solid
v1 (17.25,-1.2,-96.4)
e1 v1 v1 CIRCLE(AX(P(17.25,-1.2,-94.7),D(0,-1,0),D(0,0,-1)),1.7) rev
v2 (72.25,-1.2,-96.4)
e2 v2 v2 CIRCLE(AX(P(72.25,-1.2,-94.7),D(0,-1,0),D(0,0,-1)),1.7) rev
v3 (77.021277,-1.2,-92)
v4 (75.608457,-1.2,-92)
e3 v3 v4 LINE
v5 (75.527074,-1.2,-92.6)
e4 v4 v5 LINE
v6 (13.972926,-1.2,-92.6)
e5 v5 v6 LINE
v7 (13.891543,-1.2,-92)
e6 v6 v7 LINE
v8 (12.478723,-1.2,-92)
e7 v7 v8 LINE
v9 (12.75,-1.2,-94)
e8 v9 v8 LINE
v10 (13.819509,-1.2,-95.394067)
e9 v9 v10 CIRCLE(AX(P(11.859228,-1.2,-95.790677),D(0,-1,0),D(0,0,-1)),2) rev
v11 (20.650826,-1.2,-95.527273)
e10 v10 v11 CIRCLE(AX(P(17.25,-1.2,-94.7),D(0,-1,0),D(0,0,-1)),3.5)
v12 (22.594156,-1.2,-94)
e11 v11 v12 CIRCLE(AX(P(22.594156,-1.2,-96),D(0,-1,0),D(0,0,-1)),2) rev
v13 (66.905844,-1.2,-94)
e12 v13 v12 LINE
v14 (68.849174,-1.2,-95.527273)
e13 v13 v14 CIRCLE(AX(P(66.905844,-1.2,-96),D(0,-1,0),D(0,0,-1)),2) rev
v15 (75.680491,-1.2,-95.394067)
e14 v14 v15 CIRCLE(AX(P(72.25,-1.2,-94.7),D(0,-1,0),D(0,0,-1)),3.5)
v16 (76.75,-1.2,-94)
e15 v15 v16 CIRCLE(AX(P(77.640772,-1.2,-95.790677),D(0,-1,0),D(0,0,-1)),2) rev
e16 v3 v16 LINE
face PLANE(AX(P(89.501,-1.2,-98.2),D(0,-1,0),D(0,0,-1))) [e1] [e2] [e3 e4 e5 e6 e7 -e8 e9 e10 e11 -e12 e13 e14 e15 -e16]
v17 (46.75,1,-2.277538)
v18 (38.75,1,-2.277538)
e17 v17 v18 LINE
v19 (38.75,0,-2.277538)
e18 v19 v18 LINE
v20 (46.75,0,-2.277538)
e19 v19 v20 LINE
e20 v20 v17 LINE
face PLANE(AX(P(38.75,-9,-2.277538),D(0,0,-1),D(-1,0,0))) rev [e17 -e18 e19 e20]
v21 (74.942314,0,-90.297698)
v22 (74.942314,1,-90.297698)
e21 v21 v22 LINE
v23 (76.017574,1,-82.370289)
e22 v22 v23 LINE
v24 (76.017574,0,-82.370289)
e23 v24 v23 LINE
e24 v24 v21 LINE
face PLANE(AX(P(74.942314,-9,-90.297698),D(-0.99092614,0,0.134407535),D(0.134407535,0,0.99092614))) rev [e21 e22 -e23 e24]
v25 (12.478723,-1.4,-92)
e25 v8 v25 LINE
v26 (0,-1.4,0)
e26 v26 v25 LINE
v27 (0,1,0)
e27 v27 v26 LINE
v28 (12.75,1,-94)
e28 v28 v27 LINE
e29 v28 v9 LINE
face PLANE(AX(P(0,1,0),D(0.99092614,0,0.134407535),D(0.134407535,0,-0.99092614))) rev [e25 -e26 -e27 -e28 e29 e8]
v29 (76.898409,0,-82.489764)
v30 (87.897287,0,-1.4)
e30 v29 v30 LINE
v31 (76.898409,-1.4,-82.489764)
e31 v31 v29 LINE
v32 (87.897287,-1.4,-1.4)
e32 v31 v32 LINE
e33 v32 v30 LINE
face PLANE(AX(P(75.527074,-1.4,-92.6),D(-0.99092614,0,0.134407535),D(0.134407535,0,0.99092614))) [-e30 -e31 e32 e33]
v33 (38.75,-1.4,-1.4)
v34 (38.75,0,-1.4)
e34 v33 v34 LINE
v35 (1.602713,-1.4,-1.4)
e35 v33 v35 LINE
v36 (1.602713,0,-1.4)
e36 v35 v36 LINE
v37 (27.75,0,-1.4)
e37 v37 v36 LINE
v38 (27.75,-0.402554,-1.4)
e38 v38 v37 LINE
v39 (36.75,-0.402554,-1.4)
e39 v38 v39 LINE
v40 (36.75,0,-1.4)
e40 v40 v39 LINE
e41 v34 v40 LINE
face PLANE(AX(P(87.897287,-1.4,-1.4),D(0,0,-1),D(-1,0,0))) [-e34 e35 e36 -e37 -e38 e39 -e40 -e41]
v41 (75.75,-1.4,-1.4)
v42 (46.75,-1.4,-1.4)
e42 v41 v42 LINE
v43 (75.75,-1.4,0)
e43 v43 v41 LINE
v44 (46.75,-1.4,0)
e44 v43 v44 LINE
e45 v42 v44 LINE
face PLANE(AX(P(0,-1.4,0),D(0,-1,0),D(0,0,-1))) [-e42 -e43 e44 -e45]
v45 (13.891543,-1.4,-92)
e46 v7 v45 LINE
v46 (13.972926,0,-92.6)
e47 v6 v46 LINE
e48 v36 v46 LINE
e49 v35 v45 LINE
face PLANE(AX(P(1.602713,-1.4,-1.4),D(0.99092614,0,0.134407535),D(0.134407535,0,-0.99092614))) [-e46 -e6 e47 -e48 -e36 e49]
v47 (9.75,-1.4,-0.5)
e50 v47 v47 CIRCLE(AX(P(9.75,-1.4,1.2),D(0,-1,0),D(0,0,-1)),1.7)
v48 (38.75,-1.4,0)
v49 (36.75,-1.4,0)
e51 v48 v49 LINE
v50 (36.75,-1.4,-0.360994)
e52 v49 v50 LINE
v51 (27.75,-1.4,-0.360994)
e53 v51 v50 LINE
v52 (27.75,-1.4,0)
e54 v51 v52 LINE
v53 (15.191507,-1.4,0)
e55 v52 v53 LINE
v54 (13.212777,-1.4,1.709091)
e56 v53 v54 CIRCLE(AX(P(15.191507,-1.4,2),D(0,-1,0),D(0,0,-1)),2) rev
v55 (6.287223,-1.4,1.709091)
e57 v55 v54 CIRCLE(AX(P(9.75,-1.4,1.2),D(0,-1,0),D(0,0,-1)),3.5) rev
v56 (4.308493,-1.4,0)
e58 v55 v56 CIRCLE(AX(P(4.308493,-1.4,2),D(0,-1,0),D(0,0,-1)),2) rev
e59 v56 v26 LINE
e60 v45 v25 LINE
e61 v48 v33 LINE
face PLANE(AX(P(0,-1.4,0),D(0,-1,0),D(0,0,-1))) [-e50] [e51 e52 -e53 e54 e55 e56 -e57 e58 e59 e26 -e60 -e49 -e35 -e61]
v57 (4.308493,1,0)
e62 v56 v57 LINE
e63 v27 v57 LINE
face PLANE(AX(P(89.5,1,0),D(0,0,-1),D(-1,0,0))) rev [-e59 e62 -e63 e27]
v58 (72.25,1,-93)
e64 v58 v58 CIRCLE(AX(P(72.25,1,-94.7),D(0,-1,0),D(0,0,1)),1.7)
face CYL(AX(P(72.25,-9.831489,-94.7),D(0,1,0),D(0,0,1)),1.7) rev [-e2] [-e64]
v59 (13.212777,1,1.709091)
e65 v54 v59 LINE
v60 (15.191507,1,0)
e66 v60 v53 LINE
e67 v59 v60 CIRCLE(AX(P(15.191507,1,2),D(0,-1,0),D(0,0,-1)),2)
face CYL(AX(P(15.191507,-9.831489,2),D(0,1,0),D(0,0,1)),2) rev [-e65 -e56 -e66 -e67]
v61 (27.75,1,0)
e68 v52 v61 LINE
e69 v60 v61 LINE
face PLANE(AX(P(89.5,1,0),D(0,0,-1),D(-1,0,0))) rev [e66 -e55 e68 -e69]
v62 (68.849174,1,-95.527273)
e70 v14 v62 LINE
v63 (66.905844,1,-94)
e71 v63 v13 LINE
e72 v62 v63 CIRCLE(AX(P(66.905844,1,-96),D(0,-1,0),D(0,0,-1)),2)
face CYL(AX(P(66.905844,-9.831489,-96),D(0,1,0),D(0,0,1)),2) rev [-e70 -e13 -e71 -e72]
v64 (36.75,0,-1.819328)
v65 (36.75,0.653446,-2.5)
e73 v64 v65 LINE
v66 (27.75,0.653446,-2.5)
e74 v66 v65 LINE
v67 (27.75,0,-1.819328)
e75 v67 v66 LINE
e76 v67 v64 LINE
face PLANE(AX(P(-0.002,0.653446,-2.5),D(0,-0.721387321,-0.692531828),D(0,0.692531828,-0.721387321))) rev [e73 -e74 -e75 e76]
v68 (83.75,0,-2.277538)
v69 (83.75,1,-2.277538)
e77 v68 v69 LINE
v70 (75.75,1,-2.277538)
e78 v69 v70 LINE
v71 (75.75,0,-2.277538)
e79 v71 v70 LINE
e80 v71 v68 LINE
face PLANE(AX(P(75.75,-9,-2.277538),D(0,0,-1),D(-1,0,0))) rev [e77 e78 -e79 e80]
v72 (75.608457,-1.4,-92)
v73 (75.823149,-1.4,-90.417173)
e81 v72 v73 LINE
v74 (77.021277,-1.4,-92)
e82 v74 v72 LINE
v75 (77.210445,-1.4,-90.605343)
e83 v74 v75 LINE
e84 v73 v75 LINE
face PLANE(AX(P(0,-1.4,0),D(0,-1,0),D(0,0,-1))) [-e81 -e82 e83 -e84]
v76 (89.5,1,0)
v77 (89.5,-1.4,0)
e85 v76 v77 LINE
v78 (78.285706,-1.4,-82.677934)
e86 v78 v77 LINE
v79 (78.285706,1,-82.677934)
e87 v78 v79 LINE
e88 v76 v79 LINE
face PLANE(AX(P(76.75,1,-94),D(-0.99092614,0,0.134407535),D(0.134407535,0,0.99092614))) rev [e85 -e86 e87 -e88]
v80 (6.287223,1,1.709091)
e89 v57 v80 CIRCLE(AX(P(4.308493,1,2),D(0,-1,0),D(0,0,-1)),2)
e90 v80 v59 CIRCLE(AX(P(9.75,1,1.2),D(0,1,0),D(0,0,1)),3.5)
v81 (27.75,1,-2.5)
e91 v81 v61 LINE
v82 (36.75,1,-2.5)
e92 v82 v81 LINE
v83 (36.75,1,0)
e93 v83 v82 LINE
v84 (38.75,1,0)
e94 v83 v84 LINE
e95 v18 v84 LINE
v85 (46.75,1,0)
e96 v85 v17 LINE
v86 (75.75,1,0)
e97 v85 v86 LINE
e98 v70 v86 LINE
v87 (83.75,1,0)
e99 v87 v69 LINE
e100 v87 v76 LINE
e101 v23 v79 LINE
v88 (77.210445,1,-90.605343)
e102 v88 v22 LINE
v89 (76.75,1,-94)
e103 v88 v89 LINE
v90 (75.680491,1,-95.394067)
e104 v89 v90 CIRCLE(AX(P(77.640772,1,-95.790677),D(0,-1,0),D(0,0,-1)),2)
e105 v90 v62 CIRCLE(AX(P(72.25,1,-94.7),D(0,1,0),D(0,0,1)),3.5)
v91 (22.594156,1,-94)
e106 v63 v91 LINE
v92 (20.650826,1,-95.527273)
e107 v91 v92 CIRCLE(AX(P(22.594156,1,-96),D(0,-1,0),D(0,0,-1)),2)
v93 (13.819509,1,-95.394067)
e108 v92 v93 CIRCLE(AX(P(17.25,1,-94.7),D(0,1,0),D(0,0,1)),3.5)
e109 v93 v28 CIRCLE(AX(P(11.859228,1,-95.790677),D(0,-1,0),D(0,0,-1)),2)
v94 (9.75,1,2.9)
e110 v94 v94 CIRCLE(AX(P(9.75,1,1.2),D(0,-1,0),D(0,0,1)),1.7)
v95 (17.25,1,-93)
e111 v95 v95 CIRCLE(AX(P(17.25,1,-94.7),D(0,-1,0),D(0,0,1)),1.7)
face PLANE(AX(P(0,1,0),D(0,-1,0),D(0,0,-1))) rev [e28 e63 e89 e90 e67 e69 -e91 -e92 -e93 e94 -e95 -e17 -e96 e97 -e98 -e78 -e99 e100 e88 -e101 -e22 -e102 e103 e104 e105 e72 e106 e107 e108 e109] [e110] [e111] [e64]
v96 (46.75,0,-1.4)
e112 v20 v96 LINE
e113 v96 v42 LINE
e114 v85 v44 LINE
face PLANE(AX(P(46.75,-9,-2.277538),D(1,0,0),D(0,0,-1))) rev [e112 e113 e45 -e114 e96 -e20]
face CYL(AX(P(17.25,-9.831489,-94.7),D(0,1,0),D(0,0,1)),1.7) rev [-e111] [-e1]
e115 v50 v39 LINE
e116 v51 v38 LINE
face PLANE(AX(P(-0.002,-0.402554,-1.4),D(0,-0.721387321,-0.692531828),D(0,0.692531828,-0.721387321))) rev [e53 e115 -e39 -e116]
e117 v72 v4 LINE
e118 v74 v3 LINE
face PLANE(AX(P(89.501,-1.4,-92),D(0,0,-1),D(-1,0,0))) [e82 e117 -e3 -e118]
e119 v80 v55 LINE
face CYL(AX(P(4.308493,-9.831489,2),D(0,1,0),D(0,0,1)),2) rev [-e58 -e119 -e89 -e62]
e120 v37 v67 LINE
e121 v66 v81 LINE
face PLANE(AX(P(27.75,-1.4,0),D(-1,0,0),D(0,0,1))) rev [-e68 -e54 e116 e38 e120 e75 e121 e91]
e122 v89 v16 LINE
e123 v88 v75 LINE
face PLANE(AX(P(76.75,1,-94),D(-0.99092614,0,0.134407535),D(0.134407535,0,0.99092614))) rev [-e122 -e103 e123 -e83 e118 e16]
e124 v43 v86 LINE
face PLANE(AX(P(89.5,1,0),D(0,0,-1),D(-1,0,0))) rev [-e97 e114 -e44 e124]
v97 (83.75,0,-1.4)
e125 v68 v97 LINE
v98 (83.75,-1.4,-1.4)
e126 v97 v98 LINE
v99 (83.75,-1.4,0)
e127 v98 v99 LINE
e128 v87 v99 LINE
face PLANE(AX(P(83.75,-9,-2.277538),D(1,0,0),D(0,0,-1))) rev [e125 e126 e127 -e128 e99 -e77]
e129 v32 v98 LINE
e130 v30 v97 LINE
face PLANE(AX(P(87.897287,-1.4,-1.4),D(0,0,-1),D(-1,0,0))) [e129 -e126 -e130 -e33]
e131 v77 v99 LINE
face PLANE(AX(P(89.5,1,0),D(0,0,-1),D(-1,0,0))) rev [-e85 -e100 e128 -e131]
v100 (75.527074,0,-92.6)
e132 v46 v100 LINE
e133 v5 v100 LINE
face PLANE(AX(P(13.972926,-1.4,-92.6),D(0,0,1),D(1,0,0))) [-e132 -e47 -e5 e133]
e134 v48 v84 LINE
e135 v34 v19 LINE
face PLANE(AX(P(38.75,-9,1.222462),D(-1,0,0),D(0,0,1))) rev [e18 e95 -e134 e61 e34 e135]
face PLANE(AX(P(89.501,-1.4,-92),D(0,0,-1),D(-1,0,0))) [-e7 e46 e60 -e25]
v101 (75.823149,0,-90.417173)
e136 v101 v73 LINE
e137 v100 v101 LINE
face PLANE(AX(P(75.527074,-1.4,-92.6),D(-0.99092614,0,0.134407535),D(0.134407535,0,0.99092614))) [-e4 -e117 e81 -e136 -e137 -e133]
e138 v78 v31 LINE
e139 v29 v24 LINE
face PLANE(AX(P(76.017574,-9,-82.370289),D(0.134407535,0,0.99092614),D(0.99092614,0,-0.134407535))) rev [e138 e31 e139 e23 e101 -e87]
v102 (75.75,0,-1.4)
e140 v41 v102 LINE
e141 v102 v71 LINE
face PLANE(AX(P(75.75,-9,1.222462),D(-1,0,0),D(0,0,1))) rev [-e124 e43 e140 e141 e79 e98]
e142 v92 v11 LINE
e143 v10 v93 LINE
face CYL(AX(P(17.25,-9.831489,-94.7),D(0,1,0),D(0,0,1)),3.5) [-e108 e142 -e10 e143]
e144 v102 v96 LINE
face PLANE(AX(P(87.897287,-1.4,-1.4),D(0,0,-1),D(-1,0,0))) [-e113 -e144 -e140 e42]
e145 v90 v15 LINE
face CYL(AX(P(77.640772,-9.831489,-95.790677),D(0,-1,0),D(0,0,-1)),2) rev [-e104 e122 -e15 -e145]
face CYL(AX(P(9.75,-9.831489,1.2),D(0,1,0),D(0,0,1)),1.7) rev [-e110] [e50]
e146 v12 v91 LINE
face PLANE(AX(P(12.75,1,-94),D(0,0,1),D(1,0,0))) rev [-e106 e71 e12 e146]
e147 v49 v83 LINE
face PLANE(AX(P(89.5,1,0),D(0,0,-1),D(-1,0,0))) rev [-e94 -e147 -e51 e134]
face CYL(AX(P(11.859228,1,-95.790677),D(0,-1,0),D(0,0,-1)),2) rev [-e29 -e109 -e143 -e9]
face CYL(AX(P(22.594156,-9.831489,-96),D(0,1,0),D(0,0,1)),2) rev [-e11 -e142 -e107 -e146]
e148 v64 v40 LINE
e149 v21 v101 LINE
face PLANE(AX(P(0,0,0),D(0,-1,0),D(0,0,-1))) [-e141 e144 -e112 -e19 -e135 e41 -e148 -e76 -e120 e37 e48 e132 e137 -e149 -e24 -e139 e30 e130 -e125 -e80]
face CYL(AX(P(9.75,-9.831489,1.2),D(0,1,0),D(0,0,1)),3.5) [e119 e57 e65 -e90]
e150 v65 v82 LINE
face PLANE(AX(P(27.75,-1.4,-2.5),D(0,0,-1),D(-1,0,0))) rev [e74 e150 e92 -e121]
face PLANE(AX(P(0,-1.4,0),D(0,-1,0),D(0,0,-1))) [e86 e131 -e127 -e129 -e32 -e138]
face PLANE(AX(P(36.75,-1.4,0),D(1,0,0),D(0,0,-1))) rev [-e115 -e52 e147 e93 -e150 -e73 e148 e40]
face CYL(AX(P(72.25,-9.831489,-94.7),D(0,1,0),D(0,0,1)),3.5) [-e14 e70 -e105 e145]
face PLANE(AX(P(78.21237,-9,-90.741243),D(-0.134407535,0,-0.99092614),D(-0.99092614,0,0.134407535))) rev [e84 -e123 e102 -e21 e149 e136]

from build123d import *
from build123d.topology import SkipClean

# Parameters (mm, degrees)
EXTRUDE_1_DEPTH     = 1
EXTRUDE_2_DEPTH     = 1.4
EXTRUDE_3_DEPTH     = 2.4
CUT_EXTRUDE_2_REACH = 134.888
SKETCH_4_R          = 1.7
CUT_EXTRUDE_3_DEPTH = 10
CUT_EXTRUDE_4_REACH = 134.874
SKETCH_6_W          = 6.2
SKETCH_6_H          = 0.2
FILLET_START        = -1.2
FILLET_1_DEPTH      = 2.2
FILLET_START_2      = -1.4
FILLET_1_2_DEPTH    = 0.226512
SKETCH_7_W          = 9
SKETCH_7_H          = 2.5
CUT_EXTRUDE_5_DEPTH = 133.88811083
EXTRUDE_4_REACH     = 113.48


with BuildPart() as part:
    # 草图1 → 凸台-拉伸1 (new body)
    with BuildSketch(Plane(origin=(0, 0, 0), x_dir=(1, 0, 0), z_dir=(0, 1, 0))):
        Polygon((0, 0), (12.75, 94), (76.75, 94), (89.5, 0), align=None)
    extrude(amount=EXTRUDE_1_DEPTH)

    # 草图2 → 凸台-拉伸2 (add)
    with BuildSketch(Plane.XZ):
        Polygon((89.5, 0), (0, 0), (12.75, -94), (76.75, -94), align=None)
        Polygon((87.897286654, -1.4), (1.602713346, -1.4), (13.972926112, -92.6), (75.527073888, -92.6), align=None, mode=Mode.SUBTRACT)
    extrude(amount=EXTRUDE_2_DEPTH)

    # 草图3 → 凸台-拉伸3 (add)
    with BuildSketch(Plane(origin=(0, 1, 0), x_dir=(1, 0, 0), z_dir=(0, 1, 0))):
        with BuildLine():
            Line((6.25, -1.2), (6.25, 0))
            Line((6.25, 0), (8.545840542, 0))
            ThreePointArc((8.545840542, 0), (9.75, -2.9), (10.954159458, 0))
            Line((10.954159458, 0), (13.25, 0))
            Line((13.25, 0), (13.25, -1.2))
            ThreePointArc((13.25, -1.2), (9.75, -4.7), (6.25, -1.2))
        make_face()
        with BuildLine():
            Line((13.75, 94.7), (13.75, 94))
            Line((13.75, 94), (13.82071436, 94))
            Line((13.82071436, 94), (15.700806662, 94))
            ThreePointArc((15.700806662, 94), (17.25, 96.4), (18.799193338, 94))
            Line((18.799193338, 94), (20.75, 94))
            Line((20.75, 94), (20.75, 94.7))
            ThreePointArc((20.75, 94.7), (17.25, 98.2), (13.75, 94.7))
        make_face()
        with BuildLine():
            Line((68.75, 94.7), (68.75, 94))
            Line((68.75, 94), (70.700806662, 94))
            ThreePointArc((70.700806662, 94), (72.25, 96.4), (73.799193338, 94))
            Line((73.799193338, 94), (75.75, 94))
            Line((75.75, 94), (75.75, 94.7))
            ThreePointArc((75.75, 94.7), (72.25, 98.2), (68.75, 94.7))
        make_face()
    extrude(amount=-EXTRUDE_3_DEPTH)

    # 草图4 → 切除-拉伸2 (cut, up to next)
    with BuildSketch(Plane(origin=(0, 1, 0), x_dir=(1, 0, 0), z_dir=(0, 1, 0)), mode=Mode.PRIVATE) as cut_extrude_2_sk1:
        with Locations(Location((9.75, -1.2, 0), (0, 0, 270))):
            Circle(SKETCH_4_R)
    cut_extrude_2_tool1 = extrude(cut_extrude_2_sk1.sketch, amount=-CUT_EXTRUDE_2_REACH, mode=Mode.PRIVATE) & part.part
    # 草图4 → 切除-拉伸2 (cut, up to next)
    with BuildSketch(Plane(origin=(0, 1, 0), x_dir=(1, 0, 0), z_dir=(0, 1, 0)), mode=Mode.PRIVATE) as cut_extrude_2_sk2:
        with Locations(Location((17.25, 94.7, 0), (0, 0, 270))):
            Circle(SKETCH_4_R)
    cut_extrude_2_tool2 = extrude(cut_extrude_2_sk2.sketch, amount=-CUT_EXTRUDE_2_REACH, mode=Mode.PRIVATE) & part.part
    # 草图4 → 切除-拉伸2 (cut, up to next)
    with BuildSketch(Plane(origin=(0, 1, 0), x_dir=(1, 0, 0), z_dir=(0, 1, 0)), mode=Mode.PRIVATE) as cut_extrude_2_sk3:
        with Locations(Location((72.25, 94.7, 0), (0, 0, 270))):
            Circle(SKETCH_4_R)
    cut_extrude_2_tool3 = extrude(cut_extrude_2_sk3.sketch, amount=-CUT_EXTRUDE_2_REACH, mode=Mode.PRIVATE) & part.part
    add(cut_extrude_2_tool1.solids().sort_by_distance((9.75, 1, 1.2))[0], mode=Mode.SUBTRACT)
    add(cut_extrude_2_tool2.solids().sort_by_distance((17.25, 1, -94.7))[0], mode=Mode.SUBTRACT)
    add(cut_extrude_2_tool3.solids().sort_by_distance((72.25, 1, -94.7))[0], mode=Mode.SUBTRACT)

    # 草图5 → 切除-拉伸3 (cut)
    with SkipClean():  # the faces are left unmerged after this step: merging them gives an invalid solid
        with BuildSketch(Plane(origin=(0, 1, 0), x_dir=(1, 0, 0), z_dir=(0, 1, 0))):
            with BuildLine():
                Line((78.21236986, 90.741242548), (74.942313599, 90.297697683))
                Line((74.942313599, 90.297697683), (76.017573878, 82.370288564))
                Line((76.017573878, 82.370288564), (79.28763014, 82.81383343))
                ThreePointArc((79.28763014, 82.81383343), (82.713704559, 87.315168128), (78.21236986, 90.741242548))
            make_face()
            with BuildLine():
                Line((38.75, -1.222462011), (38.75, 2.277537989))
                Line((38.75, 2.277537989), (46.75, 2.277537989))
                Line((46.75, 2.277537989), (46.75, -1.222462011))
                ThreePointArc((46.75, -1.222462011), (42.75, -5.222462011), (38.75, -1.222462011))
            make_face()
            with BuildLine():
                Line((75.75, -1.222462011), (75.75, 2.277537989))
                Line((75.75, 2.277537989), (83.75, 2.277537989))
                Line((83.75, 2.277537989), (83.75, -1.222462011))
                ThreePointArc((83.75, -1.222462011), (79.75, -5.222462011), (75.75, -1.222462011))
            make_face()
        extrude(amount=-CUT_EXTRUDE_3_DEPTH, mode=Mode.SUBTRACT)

    # 草图6 → 切除-拉伸4 (cut, up to next)
    with BuildSketch(Plane(origin=(0, 0, 0), x_dir=(0, 0, -1), z_dir=(1, 0, 0)), mode=Mode.PRIVATE) as cut_extrude_4_sk1:
        with Locations((95.1, -1.3)):
            Rectangle(SKETCH_6_W, SKETCH_6_H)
    cut_extrude_4_tool1 = extrude(cut_extrude_4_sk1.sketch, amount=CUT_EXTRUDE_4_REACH, mode=Mode.PRIVATE) & part.part
    add(cut_extrude_4_tool1.solids().sort_by_distance((0, -1.3, -95.1))[0], mode=Mode.SUBTRACT)

    # 圆角1: read off the stored shape, not the designer's step
    # 圆角1 outline → 圆角1 (add)
    with SkipClean():  # the faces are left unmerged after this step: merging them gives an invalid solid
        with BuildSketch(Plane(origin=(0, 0, 0), x_dir=(1, 0, 0), z_dir=(0, 1, 0)).offset(FILLET_START)):
            with BuildLine():
                ThreePointArc((13.25, -1.2), (13.240681915, -1.455224942), (13.212777274, -1.709090909))
                ThreePointArc((13.212777274, -1.709090909), (13.884185107, -0.486425063), (15.191507144, 0))
                Line((15.191507144, 0), (13.25, 0))
                Line((13.25, 0), (13.25, -1.2))
            make_face()
            with BuildLine():
                ThreePointArc((4.308492856, 0), (5.615814893, -0.486425063), (6.287222726, -1.709090909))
                ThreePointArc((6.287222726, -1.709090909), (6.259318085, -1.455224942), (6.25, -1.2))
                Line((6.25, -1.2), (6.25, 0))
                Line((6.25, 0), (4.308492856, 0))
            make_face()
            with BuildLine():
                Line((75.75, 94), (76.75, 94))
                ThreePointArc((76.75, 94), (76.053957158, 94.573295448), (75.680491288, 95.394067374))
                ThreePointArc((75.680491288, 95.394067374), (75.732579469, 95.048769616), (75.75, 94.7))
                Line((75.75, 94.7), (75.75, 94))
            make_face()
            with BuildLine():
                ThreePointArc((13.75, 94.7), (13.767420531, 95.048769616), (13.819508712, 95.394067374))
                ThreePointArc((13.819508712, 95.394067374), (13.446042842, 94.573295448), (12.75, 94))
                Line((12.75, 94), (13.75, 94))
                Line((13.75, 94), (13.75, 94.7))
            make_face()
            with BuildLine():
                Line((20.75, 94), (22.594155686, 94))
                ThreePointArc((22.594155686, 94), (21.358326925, 94.427509214), (20.650826346, 95.527272727))
                ThreePointArc((20.650826346, 95.527272727), (20.725118143, 95.116598001), (20.75, 94.7))
                Line((20.75, 94.7), (20.75, 94))
            make_face()
            with BuildLine():
                ThreePointArc((68.75, 94.7), (68.774881857, 95.116598001), (68.849173654, 95.527272727))
                ThreePointArc((68.849173654, 95.527272727), (68.141673075, 94.427509214), (66.905844314, 94))
                Line((66.905844314, 94), (68.75, 94))
                Line((68.75, 94), (68.75, 94.7))
            make_face()
        extrude(amount=FILLET_1_DEPTH)

    # Fillet 1 2 outline → Fillet 1 2 (add)
    with SkipClean():  # the faces are left unmerged after this step: merging them gives an invalid solid
        with BuildSketch(Plane(origin=(0, 0, 0), x_dir=(1, 0, 0), z_dir=(0, 1, 0)).offset(FILLET_START_2)):
            with BuildLine():
                ThreePointArc((13.25, -1.2), (13.240681915, -1.455224942), (13.212777274, -1.709090909))
                ThreePointArc((13.212777274, -1.709090909), (13.884185107, -0.486425063), (15.191507144, 0))
                Line((15.191507144, 0), (13.25, 0))
                Line((13.25, 0), (13.25, -1.2))
            make_face()
            with BuildLine():
                ThreePointArc((4.308492856, 0), (5.615814893, -0.486425063), (6.287222726, -1.709090909))
                ThreePointArc((6.287222726, -1.709090909), (6.259318085, -1.455224942), (6.25, -1.2))
                Line((6.25, -1.2), (6.25, 0))
                Line((6.25, 0), (4.308492856, 0))
            make_face()
        extrude(amount=FILLET_1_2_DEPTH)

    # 草图7 → 切除-拉伸5 (cut, through all)
    with SkipClean():  # the faces are left unmerged after this step: merging them gives an invalid solid
        with BuildSketch(Plane(origin=(0, 1, 0), x_dir=(1, 0, 0), z_dir=(0, 1, 0))):
            with Locations((32.25, 1.25)):
                Rectangle(SKETCH_7_W, SKETCH_7_H)
        extrude(amount=-CUT_EXTRUDE_5_DEPTH, mode=Mode.SUBTRACT)

    # 草图8 → 凸台-拉伸4 (add, up to next)
    with BuildSketch(Plane.ZY.offset(-36.75), mode=Mode.PRIVATE) as extrude_4_sk1:
        Polygon((-2.5, 0.653445531), (-1.819327572, 0), (-2.5, 0), align=None)
    extrude_4_tool1 = extrude(extrude_4_sk1.sketch, amount=EXTRUDE_4_REACH, mode=Mode.PRIVATE) - part.part
    # 草图8 → 凸台-拉伸4 (add, up to next)
    with BuildSketch(Plane.ZY.offset(-36.75), mode=Mode.PRIVATE) as extrude_4_sk2:
        Polygon((-0.360994239, -1.4), (-1.4, -1.4), (-1.4, -0.402554469), align=None)
    extrude_4_tool2 = extrude(extrude_4_sk2.sketch, amount=EXTRUDE_4_REACH, mode=Mode.PRIVATE) - part.part
    add(extrude_4_tool1.solids().sort_by_distance((36.75, 0.217815, -2.273109))[0])
    add(extrude_4_tool2.solids().sort_by_distance((36.75, -1.067518, -1.053665))[0])


solid = part.part
